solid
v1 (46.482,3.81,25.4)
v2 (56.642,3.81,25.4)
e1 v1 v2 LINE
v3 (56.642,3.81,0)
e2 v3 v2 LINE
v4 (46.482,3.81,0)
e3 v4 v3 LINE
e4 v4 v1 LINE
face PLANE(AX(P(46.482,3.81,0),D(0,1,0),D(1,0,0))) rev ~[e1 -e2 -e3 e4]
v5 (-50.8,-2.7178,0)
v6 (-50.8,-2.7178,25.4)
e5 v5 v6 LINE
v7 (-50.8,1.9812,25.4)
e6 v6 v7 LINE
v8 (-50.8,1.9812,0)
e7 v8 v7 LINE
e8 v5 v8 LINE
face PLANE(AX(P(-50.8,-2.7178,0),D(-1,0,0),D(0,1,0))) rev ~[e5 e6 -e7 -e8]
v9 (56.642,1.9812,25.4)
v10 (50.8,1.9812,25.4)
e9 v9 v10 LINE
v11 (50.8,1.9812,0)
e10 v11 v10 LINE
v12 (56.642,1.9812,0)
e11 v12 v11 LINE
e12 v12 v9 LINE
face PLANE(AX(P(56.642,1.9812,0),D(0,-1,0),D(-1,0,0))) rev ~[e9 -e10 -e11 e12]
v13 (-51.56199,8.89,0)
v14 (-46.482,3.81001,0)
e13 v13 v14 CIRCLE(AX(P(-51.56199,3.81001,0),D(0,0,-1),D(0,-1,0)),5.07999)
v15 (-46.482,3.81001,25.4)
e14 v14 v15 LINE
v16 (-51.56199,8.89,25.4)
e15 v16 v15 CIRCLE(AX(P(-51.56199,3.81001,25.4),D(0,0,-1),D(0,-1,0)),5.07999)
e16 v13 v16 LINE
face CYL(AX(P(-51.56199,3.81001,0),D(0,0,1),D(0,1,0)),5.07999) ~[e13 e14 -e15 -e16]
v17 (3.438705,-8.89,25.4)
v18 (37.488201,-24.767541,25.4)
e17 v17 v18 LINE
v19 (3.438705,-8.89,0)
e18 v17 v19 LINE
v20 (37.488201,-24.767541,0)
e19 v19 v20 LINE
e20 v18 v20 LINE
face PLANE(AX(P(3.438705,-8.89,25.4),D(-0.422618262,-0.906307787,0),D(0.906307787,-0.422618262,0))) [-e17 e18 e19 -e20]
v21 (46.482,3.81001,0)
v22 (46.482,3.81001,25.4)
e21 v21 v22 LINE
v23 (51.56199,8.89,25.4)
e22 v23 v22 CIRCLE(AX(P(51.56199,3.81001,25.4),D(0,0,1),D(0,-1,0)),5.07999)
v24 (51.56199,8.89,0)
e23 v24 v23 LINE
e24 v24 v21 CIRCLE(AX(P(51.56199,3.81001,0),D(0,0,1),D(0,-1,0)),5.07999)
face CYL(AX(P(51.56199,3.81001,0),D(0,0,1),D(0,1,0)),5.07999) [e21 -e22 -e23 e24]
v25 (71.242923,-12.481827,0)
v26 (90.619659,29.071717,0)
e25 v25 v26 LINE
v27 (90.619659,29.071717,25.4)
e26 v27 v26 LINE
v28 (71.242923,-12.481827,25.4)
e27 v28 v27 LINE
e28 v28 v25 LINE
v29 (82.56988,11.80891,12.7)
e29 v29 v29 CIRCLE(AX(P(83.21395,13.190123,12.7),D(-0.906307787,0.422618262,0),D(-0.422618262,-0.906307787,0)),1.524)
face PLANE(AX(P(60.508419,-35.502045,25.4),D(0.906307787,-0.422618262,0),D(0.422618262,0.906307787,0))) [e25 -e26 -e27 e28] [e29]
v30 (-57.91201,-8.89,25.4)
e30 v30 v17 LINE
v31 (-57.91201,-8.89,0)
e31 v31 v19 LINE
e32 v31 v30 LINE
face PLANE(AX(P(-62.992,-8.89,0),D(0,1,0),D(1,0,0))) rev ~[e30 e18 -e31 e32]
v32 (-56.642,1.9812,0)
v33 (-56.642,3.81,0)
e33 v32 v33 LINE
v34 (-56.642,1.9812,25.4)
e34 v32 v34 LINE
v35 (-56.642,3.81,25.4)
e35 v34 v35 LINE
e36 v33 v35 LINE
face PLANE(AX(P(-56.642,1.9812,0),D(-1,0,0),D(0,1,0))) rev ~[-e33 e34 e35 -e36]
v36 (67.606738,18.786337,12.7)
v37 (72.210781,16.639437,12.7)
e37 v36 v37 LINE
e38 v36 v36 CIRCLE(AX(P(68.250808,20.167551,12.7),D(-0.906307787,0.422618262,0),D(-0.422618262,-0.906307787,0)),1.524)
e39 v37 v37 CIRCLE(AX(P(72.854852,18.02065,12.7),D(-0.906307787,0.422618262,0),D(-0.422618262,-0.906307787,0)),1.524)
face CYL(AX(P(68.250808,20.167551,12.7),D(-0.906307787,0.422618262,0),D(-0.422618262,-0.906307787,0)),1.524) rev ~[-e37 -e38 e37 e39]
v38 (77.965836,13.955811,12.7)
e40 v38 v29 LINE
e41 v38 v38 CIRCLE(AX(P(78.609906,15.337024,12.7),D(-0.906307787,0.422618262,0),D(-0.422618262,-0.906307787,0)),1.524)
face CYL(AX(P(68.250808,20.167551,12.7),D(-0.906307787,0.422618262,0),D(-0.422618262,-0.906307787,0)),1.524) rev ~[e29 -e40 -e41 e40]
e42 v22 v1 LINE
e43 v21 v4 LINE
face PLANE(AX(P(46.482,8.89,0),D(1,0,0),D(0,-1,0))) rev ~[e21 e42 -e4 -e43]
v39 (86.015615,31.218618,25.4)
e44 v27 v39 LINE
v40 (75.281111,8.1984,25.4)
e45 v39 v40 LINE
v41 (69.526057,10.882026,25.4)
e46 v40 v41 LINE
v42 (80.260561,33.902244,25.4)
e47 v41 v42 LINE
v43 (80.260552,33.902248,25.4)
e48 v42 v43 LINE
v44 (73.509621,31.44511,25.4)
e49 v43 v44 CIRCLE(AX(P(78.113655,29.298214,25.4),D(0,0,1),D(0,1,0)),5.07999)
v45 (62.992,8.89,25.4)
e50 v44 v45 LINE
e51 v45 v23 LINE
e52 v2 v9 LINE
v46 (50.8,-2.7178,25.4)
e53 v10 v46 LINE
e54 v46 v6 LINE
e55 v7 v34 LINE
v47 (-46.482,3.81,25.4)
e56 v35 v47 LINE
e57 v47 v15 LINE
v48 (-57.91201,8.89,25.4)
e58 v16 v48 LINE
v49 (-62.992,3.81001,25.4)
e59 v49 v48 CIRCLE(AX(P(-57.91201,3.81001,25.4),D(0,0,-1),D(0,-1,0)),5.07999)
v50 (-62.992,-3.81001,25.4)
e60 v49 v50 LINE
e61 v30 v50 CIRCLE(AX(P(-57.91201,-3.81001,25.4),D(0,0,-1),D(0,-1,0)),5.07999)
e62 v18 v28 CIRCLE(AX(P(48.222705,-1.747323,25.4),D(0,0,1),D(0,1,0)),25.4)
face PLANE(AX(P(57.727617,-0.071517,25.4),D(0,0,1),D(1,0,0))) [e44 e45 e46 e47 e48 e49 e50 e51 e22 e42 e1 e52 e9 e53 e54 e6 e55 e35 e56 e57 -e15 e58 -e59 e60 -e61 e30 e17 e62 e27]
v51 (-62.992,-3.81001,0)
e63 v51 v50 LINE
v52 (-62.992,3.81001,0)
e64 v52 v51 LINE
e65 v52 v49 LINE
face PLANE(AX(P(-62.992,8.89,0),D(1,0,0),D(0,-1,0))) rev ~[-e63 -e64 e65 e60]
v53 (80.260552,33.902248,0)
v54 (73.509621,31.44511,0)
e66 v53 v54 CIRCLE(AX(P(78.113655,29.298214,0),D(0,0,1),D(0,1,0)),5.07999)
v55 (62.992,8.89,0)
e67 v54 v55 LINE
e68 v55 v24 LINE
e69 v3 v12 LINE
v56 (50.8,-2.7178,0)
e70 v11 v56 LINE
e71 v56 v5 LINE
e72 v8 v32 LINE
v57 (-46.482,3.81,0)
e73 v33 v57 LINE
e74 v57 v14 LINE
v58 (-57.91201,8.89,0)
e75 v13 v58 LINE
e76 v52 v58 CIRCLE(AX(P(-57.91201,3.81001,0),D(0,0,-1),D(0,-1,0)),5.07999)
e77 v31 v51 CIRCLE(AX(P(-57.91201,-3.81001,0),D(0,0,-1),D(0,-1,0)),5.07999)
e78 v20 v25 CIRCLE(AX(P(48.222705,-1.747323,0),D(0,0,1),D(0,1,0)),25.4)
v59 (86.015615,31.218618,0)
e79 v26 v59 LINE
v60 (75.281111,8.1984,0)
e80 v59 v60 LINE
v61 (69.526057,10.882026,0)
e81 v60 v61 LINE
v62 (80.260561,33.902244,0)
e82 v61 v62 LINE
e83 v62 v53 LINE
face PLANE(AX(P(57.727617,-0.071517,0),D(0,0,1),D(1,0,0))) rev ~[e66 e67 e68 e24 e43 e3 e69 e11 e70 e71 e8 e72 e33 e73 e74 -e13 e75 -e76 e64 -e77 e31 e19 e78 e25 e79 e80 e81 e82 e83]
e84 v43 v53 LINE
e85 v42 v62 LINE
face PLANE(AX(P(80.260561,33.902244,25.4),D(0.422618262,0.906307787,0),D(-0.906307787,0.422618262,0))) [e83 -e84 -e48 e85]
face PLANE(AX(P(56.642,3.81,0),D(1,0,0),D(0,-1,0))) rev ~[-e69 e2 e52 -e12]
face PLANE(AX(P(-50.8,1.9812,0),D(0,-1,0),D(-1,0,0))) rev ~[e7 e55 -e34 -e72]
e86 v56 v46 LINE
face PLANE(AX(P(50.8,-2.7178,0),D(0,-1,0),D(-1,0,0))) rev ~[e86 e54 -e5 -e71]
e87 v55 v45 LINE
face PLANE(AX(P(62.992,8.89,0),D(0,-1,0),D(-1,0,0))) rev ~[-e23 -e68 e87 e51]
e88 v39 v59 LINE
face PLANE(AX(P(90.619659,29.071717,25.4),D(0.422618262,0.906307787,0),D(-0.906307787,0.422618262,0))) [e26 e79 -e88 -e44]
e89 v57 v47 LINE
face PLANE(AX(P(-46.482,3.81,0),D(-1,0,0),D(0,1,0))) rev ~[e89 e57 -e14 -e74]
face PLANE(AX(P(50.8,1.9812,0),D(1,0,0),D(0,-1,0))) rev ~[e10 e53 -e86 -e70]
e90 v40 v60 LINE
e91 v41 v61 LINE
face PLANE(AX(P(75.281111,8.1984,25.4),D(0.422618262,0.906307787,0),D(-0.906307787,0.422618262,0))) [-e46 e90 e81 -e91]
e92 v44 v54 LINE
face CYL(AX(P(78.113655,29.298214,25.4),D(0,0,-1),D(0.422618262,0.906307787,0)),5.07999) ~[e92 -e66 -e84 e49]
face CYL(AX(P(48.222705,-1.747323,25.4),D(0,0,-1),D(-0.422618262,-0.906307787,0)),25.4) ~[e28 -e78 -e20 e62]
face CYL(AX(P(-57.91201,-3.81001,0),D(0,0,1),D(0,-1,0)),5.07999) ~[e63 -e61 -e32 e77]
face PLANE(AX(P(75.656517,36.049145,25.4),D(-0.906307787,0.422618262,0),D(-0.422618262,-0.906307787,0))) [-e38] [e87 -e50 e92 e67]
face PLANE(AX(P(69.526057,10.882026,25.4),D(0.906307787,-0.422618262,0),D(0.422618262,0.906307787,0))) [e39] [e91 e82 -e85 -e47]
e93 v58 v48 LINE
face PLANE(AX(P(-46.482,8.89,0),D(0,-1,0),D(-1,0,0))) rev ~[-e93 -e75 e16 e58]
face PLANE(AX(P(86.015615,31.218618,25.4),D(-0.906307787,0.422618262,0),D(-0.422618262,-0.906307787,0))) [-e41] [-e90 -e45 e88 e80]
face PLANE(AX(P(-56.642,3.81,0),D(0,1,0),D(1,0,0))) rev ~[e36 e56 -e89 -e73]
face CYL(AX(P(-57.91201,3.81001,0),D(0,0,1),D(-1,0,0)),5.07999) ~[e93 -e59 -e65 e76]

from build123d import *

# Parameters (mm, degrees)
F1_DEPTH = 25.4
F3_DEPTH = 25.4
F4_R     = 25.4
F5_R     = 5.07999
F6_R     = 1.524
F7_DEPTH = 25.4


# Not quite as in the source:
# - a fillet or chamfer is up to 0.001 mm smaller than in the source, because OpenCascade refuses the exact size


with BuildPart() as f1:
    # F0 (on Top) → F1 (new body)
    with BuildSketch(Plane.XY):
        Polygon((-46.482, 8.89), (-62.992, 8.89), (-62.992, -8.89), (62.992, -8.89), (62.992, 8.89), (46.482, 8.89), (46.482, 3.81), (56.642, 3.81), (56.642, 1.9812), (50.8, 1.9812), (50.8, -2.7178), (-50.8, -2.7178), (-50.8, 1.9812), (-56.642, 1.9812), (-56.642, 3.81), (-46.482, 3.81), align=None)
    extrude(amount=F1_DEPTH)

    # F2 (on face) → F3 (join)
    with BuildSketch(Plane.XY.offset(25.4)):
        Polygon((75.6565171085, 36.049144584), (62.992, 8.89), (62.992, -8.89), (3.4387046284, -8.89), (60.5084189693, -35.5020448459), (90.6196586724, 29.0717170827), (86.0156151143, 31.2186178523), (75.2811112661, 8.1984000616), (69.5260568184, 10.8820260237), (80.2605606666, 33.9022438144), align=None)
    extrude(amount=-F3_DEPTH)

    # F4
    f4_edges = [f1.edges().sort_by_distance(p)[0] for p in [
        (60.508419, -35.502045, 12.7),
    ]]
    fillet(f4_edges, radius=F4_R)

    # F5 (radius 5.08 in the source; OpenCascade refuses exactly that, so slightly less here)
    f5_edges = [f1.edges().sort_by_distance(p)[0] for p in [
        (-62.992, -8.89, 12.7),
        (-62.992, 8.89, 12.7),
        (75.656517, 36.049145, 12.7),
        (46.482, 8.89, 12.7),
        (-46.482, 8.89, 12.7),
    ]]
    fillet(f5_edges, radius=F5_R)

    # F6 (on face) → F7 (cut)
    with BuildSketch(Plane(origin=(48.336171005, -22.5395267055, 0), x_dir=(-0.4226182617, -0.906307787, 0), z_dir=(-0.906307787, 0.4226182617, 0))):
        with Locations((-47.1220459863, 12.7)):
            Circle(F6_R)
    extrude(amount=-F7_DEPTH, mode=Mode.SUBTRACT)


solid = f1.part
